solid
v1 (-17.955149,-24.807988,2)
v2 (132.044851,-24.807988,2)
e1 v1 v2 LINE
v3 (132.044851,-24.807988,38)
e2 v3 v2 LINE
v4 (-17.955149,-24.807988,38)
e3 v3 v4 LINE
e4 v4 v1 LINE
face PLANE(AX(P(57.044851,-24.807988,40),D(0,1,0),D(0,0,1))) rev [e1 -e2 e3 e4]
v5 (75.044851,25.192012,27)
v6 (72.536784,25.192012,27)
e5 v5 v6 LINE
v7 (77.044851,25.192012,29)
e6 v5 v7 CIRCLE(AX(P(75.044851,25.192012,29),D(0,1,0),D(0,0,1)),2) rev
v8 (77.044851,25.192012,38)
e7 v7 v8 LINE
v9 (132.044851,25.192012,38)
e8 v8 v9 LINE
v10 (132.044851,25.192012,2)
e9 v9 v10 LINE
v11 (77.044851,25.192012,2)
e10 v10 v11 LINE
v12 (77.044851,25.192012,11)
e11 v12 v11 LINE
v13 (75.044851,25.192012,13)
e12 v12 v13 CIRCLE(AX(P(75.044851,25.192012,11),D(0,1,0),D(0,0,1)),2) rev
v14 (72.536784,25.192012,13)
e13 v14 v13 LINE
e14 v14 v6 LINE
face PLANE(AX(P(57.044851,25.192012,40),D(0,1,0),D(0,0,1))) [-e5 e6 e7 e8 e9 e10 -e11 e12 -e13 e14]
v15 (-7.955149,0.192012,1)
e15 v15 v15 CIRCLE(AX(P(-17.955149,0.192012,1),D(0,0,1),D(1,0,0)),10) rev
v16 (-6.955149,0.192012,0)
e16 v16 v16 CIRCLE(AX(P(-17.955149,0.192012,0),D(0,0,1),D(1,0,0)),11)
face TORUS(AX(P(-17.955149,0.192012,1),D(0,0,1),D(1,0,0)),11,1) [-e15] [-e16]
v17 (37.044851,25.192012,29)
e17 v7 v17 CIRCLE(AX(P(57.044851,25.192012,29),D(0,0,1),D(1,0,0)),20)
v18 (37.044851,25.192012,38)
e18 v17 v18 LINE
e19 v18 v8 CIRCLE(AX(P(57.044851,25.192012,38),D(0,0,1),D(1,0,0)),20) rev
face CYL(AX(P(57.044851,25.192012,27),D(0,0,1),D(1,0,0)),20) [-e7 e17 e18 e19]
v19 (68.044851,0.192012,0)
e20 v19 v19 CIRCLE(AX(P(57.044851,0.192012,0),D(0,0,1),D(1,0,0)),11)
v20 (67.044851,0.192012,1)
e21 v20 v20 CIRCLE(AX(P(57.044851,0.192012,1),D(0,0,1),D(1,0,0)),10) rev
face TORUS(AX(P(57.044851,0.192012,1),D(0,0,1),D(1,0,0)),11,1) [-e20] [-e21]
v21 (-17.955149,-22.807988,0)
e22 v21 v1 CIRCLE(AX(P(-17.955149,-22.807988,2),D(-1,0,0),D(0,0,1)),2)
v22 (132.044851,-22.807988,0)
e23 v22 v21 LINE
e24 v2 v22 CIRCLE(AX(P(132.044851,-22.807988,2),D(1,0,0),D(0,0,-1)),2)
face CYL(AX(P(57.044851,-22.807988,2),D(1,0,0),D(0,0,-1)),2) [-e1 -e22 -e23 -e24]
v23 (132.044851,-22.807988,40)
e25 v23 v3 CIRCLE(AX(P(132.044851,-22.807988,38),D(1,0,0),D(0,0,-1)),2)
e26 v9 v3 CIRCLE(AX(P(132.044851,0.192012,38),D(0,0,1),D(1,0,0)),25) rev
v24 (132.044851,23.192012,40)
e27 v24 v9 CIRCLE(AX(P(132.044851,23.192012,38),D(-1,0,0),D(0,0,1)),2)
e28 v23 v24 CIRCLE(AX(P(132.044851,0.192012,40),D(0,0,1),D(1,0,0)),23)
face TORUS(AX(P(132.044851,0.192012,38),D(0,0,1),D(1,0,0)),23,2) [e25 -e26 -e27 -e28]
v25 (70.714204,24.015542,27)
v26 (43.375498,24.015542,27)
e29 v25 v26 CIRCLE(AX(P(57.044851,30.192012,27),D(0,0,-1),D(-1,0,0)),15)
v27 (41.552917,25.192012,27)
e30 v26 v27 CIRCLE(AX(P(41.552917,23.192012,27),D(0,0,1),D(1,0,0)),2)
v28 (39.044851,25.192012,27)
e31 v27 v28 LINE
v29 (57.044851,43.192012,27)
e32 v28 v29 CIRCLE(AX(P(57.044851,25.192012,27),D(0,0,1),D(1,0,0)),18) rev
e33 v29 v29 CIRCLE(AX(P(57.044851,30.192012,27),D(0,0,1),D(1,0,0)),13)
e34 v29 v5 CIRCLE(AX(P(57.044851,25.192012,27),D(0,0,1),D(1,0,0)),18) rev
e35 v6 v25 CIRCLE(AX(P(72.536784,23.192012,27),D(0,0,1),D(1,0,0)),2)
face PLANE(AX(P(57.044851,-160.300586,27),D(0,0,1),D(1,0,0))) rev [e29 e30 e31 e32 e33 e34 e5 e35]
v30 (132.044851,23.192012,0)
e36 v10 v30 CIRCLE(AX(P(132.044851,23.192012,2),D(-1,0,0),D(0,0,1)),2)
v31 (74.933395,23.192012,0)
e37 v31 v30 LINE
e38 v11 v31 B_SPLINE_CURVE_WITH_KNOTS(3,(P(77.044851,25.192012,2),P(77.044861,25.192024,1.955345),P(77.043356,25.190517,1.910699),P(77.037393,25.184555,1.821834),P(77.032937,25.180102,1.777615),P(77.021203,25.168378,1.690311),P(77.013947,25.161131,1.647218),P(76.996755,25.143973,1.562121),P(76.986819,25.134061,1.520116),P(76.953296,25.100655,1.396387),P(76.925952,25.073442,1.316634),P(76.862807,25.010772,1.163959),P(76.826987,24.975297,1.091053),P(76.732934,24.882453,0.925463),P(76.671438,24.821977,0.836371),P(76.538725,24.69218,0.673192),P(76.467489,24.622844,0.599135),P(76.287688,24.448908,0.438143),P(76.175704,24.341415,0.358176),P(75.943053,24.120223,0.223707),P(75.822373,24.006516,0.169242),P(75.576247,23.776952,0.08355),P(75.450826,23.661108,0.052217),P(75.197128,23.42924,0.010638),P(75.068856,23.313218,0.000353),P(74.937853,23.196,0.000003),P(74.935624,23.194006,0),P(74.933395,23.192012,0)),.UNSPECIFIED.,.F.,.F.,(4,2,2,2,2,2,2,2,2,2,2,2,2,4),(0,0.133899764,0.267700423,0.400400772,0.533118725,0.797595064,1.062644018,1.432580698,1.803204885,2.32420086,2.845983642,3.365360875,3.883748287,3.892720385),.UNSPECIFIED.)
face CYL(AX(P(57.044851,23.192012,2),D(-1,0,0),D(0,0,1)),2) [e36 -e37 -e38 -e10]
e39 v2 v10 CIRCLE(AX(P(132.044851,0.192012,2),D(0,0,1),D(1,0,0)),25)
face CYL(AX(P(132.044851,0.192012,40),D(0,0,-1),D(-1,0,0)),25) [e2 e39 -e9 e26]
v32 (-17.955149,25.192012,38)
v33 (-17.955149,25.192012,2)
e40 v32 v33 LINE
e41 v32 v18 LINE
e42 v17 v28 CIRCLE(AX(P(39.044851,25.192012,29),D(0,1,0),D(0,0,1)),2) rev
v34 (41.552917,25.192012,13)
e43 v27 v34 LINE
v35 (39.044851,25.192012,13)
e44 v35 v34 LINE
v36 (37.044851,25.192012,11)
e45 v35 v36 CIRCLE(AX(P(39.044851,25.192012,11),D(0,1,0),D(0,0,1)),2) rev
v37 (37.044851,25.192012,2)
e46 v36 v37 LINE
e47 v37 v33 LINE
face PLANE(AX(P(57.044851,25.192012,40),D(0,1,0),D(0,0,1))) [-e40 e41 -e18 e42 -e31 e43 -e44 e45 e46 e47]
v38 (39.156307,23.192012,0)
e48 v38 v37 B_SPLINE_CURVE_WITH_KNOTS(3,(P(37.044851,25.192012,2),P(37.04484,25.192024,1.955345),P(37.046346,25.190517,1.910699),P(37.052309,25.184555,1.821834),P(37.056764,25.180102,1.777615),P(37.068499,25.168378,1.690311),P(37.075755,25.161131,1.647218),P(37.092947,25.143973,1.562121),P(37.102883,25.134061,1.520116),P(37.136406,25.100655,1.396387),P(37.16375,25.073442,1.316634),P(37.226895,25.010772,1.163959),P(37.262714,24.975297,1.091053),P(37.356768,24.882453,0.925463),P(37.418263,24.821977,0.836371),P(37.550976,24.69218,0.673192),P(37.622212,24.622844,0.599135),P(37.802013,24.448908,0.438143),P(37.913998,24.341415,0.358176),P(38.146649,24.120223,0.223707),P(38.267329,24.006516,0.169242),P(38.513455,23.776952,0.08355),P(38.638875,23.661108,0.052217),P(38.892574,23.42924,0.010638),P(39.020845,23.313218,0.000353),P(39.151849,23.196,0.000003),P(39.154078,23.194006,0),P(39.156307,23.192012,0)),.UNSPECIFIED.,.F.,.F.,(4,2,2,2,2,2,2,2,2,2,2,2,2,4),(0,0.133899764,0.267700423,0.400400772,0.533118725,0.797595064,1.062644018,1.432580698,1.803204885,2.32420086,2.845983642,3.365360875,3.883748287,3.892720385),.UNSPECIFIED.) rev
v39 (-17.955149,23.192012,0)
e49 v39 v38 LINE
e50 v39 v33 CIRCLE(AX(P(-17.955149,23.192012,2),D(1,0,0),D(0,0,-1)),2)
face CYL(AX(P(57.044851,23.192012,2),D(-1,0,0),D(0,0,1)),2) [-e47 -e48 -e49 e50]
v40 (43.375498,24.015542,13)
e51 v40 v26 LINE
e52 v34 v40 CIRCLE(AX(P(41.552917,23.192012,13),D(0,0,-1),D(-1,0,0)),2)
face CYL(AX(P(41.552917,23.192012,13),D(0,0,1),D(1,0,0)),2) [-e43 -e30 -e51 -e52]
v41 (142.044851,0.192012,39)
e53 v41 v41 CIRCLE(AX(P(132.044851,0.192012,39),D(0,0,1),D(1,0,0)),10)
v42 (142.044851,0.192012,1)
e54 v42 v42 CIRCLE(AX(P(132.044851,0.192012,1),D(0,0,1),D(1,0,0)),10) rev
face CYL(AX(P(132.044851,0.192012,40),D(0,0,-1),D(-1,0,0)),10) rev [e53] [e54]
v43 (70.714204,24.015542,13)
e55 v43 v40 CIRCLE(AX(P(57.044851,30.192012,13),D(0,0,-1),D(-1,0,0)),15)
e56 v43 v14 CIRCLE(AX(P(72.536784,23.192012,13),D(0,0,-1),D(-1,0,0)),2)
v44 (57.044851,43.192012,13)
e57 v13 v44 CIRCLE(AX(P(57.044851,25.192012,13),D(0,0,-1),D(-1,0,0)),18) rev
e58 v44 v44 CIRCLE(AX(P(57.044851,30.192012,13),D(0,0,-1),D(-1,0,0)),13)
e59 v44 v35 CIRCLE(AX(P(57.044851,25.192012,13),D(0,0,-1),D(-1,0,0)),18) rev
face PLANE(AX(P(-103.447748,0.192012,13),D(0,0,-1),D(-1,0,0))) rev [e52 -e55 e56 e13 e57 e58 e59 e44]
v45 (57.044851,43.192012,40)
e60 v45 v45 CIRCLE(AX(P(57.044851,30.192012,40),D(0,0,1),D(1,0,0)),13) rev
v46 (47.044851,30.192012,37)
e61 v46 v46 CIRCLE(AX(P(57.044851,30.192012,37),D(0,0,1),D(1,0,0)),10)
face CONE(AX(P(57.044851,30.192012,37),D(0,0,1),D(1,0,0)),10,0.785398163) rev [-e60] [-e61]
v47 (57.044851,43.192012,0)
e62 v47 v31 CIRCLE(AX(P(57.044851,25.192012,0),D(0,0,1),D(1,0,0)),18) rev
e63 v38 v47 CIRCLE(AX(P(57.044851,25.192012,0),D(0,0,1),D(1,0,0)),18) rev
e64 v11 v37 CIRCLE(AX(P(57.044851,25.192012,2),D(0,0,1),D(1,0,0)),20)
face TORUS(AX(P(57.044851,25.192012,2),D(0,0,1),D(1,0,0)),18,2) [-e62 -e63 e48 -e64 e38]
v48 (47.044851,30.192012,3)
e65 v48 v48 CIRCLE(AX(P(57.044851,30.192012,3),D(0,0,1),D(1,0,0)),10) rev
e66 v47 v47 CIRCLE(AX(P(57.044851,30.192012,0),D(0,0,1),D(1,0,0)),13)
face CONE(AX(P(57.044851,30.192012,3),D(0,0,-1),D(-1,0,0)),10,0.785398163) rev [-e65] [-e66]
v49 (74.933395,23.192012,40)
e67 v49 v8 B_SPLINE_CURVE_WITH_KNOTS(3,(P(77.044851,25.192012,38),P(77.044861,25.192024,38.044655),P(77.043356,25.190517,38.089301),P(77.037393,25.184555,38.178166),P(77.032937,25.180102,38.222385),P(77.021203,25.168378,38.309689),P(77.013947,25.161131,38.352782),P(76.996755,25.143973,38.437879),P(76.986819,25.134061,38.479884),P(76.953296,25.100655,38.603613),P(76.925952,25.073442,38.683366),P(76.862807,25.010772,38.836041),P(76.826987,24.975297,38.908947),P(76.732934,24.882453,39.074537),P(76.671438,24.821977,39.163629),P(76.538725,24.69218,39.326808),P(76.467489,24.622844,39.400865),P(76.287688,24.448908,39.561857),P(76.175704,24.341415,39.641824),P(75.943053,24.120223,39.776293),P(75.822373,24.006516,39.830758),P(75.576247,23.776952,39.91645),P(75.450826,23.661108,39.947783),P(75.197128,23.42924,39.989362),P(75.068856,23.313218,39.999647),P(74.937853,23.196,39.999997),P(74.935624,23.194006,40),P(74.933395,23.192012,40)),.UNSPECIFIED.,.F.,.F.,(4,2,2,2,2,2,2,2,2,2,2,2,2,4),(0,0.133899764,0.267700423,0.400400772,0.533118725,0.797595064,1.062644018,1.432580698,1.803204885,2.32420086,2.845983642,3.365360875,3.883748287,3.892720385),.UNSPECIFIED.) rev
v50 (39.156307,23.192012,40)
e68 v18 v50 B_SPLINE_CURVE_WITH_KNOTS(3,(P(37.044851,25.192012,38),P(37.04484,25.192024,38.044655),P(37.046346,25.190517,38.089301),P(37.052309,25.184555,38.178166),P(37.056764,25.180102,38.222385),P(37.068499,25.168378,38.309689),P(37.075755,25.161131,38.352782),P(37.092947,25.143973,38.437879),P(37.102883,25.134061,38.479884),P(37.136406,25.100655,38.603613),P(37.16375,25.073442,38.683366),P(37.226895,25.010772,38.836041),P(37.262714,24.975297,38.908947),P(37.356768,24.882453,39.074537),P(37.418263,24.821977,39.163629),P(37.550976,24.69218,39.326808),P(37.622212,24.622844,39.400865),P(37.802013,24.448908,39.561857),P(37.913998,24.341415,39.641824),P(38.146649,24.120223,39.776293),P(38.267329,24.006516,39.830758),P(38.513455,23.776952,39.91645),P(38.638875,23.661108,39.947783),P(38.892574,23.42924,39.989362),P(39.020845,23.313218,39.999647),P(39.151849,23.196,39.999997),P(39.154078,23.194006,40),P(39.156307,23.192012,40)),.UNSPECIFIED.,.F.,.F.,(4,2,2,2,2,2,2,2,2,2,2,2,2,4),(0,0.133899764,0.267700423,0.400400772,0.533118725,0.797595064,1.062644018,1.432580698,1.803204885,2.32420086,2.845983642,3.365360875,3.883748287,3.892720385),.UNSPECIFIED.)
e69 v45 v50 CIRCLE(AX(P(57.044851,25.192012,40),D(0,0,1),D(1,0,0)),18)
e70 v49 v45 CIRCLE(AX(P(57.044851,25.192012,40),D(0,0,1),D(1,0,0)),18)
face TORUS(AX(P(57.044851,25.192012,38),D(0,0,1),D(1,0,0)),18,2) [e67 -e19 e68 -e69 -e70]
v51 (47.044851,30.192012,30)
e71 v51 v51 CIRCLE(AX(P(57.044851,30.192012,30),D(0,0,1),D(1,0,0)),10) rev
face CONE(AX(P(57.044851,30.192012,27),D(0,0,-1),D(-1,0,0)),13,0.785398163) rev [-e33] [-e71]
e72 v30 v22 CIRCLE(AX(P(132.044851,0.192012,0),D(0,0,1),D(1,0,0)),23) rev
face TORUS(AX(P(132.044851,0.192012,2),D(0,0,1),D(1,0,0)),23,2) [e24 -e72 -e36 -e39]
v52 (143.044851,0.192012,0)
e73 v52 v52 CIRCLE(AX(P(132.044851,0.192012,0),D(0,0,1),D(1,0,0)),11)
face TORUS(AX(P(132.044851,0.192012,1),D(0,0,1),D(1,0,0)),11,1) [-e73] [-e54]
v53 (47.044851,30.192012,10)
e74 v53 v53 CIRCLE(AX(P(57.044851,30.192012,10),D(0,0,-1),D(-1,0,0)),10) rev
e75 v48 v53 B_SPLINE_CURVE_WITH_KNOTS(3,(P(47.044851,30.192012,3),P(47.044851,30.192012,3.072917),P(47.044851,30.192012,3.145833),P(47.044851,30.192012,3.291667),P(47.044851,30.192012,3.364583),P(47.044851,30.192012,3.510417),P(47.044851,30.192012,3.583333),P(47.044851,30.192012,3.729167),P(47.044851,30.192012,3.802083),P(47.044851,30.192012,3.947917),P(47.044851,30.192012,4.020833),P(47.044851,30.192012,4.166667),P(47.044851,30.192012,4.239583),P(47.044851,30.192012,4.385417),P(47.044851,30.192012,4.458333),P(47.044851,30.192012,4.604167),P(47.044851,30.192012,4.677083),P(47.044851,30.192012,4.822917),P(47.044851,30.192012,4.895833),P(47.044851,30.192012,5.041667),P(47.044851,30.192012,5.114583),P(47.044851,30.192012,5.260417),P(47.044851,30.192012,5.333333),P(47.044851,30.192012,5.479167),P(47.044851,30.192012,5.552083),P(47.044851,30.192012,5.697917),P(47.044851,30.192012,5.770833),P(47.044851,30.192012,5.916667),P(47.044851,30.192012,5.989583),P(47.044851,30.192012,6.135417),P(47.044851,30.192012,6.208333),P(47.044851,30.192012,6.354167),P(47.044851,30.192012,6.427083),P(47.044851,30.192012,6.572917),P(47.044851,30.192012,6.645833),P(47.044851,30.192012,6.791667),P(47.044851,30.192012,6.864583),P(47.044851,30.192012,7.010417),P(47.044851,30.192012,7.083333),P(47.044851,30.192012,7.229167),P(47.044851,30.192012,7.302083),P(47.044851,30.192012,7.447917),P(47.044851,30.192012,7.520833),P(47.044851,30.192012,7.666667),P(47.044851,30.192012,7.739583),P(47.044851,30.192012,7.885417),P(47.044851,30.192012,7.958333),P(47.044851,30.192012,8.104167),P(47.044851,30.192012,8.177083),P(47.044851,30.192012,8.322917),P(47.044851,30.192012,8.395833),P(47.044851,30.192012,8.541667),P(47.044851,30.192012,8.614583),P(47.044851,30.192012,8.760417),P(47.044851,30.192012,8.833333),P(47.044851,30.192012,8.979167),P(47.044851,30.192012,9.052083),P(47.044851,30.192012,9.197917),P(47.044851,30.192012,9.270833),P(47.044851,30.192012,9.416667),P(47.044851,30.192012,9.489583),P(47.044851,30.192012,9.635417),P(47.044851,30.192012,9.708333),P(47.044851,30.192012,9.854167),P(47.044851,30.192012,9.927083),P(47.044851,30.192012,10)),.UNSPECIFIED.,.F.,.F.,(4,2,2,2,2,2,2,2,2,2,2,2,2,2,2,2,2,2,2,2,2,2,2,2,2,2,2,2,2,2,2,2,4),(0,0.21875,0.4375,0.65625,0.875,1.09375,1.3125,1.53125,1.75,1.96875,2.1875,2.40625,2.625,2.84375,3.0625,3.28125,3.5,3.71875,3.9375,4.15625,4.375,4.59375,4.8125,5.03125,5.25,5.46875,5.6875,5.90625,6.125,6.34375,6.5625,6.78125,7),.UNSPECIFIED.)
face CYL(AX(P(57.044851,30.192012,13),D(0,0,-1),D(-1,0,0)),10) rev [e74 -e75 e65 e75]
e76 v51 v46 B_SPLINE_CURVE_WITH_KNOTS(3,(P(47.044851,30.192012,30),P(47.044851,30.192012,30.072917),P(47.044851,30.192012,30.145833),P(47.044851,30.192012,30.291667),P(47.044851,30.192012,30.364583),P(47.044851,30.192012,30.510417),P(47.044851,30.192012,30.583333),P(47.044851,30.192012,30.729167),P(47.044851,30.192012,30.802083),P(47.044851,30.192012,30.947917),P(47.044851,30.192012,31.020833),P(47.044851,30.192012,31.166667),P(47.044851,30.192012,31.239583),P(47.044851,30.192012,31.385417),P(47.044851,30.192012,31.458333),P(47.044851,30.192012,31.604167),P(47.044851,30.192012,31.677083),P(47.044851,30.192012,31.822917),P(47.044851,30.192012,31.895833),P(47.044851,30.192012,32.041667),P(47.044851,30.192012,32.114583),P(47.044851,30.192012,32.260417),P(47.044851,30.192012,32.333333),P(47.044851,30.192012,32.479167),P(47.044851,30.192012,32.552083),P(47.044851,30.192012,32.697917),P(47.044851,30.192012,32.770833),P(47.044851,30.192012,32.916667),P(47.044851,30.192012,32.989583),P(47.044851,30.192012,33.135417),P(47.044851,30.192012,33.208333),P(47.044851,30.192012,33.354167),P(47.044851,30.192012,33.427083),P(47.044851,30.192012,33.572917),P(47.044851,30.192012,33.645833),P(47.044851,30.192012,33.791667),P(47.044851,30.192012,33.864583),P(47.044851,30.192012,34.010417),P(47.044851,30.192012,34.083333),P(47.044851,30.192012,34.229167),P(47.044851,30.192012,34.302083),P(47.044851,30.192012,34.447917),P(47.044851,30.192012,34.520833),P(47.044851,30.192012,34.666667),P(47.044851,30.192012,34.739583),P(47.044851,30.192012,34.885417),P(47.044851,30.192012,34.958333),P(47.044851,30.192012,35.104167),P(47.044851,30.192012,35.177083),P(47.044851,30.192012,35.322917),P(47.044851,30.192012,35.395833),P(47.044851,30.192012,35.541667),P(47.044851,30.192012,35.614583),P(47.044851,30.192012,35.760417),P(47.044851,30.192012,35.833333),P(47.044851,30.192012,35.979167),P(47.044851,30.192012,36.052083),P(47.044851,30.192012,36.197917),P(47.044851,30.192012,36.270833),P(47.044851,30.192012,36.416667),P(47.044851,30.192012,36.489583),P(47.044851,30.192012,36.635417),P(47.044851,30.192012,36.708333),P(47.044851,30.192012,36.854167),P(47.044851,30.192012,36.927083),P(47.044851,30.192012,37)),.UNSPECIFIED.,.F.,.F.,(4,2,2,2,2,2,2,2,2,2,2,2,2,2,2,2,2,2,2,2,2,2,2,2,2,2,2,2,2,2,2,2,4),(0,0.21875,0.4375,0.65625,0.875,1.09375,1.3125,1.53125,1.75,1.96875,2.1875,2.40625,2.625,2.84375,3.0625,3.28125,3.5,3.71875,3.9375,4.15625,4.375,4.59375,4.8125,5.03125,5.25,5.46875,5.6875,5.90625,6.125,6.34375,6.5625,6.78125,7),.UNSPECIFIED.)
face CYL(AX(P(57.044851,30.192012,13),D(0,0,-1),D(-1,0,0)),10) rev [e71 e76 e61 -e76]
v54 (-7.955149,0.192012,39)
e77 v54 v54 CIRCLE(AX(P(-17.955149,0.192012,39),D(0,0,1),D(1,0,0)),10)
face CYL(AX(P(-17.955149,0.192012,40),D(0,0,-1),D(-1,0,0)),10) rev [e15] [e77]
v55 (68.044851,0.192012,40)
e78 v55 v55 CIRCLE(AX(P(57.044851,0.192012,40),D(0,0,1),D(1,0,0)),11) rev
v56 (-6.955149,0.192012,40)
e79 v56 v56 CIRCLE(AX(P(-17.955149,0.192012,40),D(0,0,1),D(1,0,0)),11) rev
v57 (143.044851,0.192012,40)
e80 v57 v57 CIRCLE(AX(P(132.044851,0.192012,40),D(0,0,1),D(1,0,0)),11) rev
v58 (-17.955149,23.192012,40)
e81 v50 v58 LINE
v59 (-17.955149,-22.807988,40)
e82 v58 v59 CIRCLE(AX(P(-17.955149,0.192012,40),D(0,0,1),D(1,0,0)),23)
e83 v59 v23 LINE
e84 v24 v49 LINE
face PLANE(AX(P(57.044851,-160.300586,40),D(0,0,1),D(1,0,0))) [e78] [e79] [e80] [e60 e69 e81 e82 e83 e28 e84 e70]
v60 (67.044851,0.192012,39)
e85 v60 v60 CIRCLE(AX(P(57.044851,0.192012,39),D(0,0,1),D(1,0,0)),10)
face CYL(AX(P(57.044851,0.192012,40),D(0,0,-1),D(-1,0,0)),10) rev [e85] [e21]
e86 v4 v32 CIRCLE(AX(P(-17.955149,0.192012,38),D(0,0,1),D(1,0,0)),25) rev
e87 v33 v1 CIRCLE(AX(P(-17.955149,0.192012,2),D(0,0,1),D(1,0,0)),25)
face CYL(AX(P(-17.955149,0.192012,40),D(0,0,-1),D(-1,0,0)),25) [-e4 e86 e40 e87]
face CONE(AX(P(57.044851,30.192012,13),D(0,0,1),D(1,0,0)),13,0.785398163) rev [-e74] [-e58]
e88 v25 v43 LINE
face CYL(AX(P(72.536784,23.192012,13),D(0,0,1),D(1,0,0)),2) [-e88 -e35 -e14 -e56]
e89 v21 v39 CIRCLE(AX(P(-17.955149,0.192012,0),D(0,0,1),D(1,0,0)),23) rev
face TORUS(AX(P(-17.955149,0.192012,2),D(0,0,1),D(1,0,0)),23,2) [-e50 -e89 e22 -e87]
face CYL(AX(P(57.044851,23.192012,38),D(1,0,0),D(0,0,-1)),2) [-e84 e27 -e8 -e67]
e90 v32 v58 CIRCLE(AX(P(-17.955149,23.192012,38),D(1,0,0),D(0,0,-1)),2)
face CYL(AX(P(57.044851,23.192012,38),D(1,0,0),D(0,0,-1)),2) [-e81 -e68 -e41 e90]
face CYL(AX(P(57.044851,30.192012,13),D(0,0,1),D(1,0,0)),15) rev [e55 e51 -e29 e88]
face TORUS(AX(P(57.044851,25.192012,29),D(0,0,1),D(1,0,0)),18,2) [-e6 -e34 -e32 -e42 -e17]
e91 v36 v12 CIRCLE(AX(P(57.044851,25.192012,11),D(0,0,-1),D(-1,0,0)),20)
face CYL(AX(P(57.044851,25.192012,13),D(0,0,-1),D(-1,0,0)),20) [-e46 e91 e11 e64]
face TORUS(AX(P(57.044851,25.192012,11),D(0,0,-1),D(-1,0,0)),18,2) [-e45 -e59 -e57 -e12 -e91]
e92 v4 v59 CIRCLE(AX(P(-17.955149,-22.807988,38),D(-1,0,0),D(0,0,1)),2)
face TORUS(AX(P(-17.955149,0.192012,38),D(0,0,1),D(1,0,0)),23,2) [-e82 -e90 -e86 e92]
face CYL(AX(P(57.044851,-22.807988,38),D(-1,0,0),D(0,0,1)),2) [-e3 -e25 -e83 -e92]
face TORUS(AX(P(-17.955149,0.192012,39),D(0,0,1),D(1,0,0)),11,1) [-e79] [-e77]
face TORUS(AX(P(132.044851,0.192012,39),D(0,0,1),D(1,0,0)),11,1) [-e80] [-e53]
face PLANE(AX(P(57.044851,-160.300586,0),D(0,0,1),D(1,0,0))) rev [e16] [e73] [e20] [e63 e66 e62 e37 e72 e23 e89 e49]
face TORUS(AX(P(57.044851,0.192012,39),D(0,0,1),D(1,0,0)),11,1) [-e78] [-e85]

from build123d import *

# Parameters (mm, degrees)
ESQUISSE1_R             = 25
ESQUISSE1_R_2           = 10
ESQUISSE1_R_3           = 25.000000000000004
ESQUISSE1_R_4           = 10.000000000000009
BOSS_EXTRU_1_DEPTH      = 40
BOSS_EXTRU_6_DEPTH      = 13
BOSS_EXTRU_7_START      = -13
BOSS_EXTRU_7_DEPTH      = 13
ENL_V_START             = -40
ENL_V_MAT_EXTRU_3_DEPTH = 40
ESQUISSE16_R            = 14.999999999999998
ENL_V_MAT_EXTRU_8_DEPTH = 14
CONG_4_R                = 2
CONG_7_R                = 1
CHANFREIN2_SIZE         = 3


with BuildPart() as part:
    # Esquisse1 → Boss.-Extru.1 (new body)
    # profile 1 of 4: a face of its own
    with BuildSketch(Plane.XY):
        with Locations((-17.955149191533145, 0.1920124875943955)):
            Circle(ESQUISSE1_R)
        with Locations((-17.955149191533145, 0.1920124875943955)):
            Circle(ESQUISSE1_R_2, mode=Mode.SUBTRACT)
    # profile 2 of 4: a face of its own
    with BuildSketch(Plane.XY):
        with BuildLine():
            Line((57.044850808466855, 10.192012487594386), (57.044850808466855, 25.192012487594397))
            Line((57.044850808466855, 25.192012487594397), (-17.95514919153466, 25.192012487594397))
            ThreePointArc((-17.95514919153466, 25.192012487594397), (-0.27747966186999307, 17.86968201725862), (7.044850808466855, 0.1920124875943955))
            ThreePointArc((7.044850808466855, 0.19201248759438935), (-0.27747966186997886, -17.485657042069814), (-17.955149191534638, -24.807987512405603))
            Line((-17.955149191534638, -24.807987512405607), (57.044850808466855, -24.807987512405607))
            Line((57.044850808466855, -24.807987512405603), (57.044850808466855, -9.807987512405603))
            ThreePointArc((57.0448508084668, -9.8079875124056), (47.04485080846686, 0.192012487594395), (57.044850808466805, 10.192012487594386))
        make_face()
    # profile 3 of 4: a face of its own
    with BuildSketch(Plane.XY):
        with BuildLine():
            Line((132.04485080846524, 25.192012487594397), (57.044850808466855, 25.192012487594397))
            Line((57.044850808466855, 25.192012487594397), (57.044850808466855, 10.192012487594386))
            ThreePointArc((57.044850808466805, 10.192012487594386), (64.11591862033231, 7.263080299459882), (67.04485080846685, 0.19201248759439377))
            ThreePointArc((67.04485080846685, 0.19201248759439132), (64.11591862033231, -6.879055324271097), (57.0448508084668, -9.8079875124056))
            Line((57.044850808466855, -9.807987512405603), (57.044850808466855, -24.807987512405603))
            Line((57.044850808466855, -24.807987512405607), (132.04485080846544, -24.807987512405607))
            ThreePointArc((132.04485080846544, -24.807987512405607), (107.04485080846686, 0.19201248759430972), (132.04485080846524, 25.1920124875944))
        make_face()
    # profile 4 of 4: a face of its own
    with BuildSketch(Plane.XY):
        with Locations((132.04485080846686, 0.1920124875943955)):
            Circle(ESQUISSE1_R_3)
        with Locations((132.04485080846686, 0.1920124875943955)):
            Circle(ESQUISSE1_R_4, mode=Mode.SUBTRACT)
    extrude(amount=BOSS_EXTRU_1_DEPTH)

    # Esquisse2 → Boss.-Extru.6 (add)
    with BuildSketch(Plane(origin=(0, 0, 0), x_dir=(-1, 0, 0), z_dir=(0, 0, -1))):
        with BuildLine():
            Line((-77.04485080846686, 25.192012487594397), (-65.7051048463114, 25.192012487594397))
            ThreePointArc((-65.70510484631134, 25.192012487594546), (-59.63304125949198, 39.8512707504851), (-47.04485080846686, 30.192012487594393))
            ThreePointArc((-47.04485080846686, 30.19201248759439), (-47.38559254557614, 27.603822036569323), (-48.38459677062232, 25.19201248759465))
            Line((-48.38459677062223, 25.192012487594397), (-37.04485080846687, 25.192012487594397))
            ThreePointArc((-37.04485080846687, 25.192012487594397), (-57.04485080846686, 45.19201248759439), (-77.04485080846686, 25.1920124875944))
        make_face()
    extrude(amount=-BOSS_EXTRU_6_DEPTH)

    # Esquisse12 → Boss.-Extru.7 (add)
    with BuildSketch(Plane.XY.offset(40).offset(BOSS_EXTRU_7_START)):
        with BuildLine():
            ThreePointArc((48.384596770622466, 25.192012487594397), (48.38459677062255, 35.192012487594525), (57.04485080846716, 40.1920124875944))
            Line((57.04485080846686, 40.1920124875944), (57.04485080846686, 45.19201248759438))
            ThreePointArc((57.04485080846686, 45.19201248759439), (42.90271518473592, 39.33414811132534), (37.04485080846687, 25.1920124875944))
            Line((37.04485080846687, 25.192012487594397), (48.38459677062247, 25.192012487594397))
        make_face()
        with BuildLine():
            Line((57.04485080846686, 45.19201248759438), (57.04485080846686, 40.1920124875944))
            ThreePointArc((57.04485080846716, 40.1920124875944), (64.11591862033245, 37.263080299459766), (67.04485080846686, 30.192012487594393))
            ThreePointArc((67.04485080846686, 30.19201248759439), (66.70410907135755, 27.603822036569184), (65.70510484631126, 25.192012487594397))
            Line((65.70510484631126, 25.192012487594397), (77.04485080846686, 25.192012487594397))
            ThreePointArc((77.04485080846686, 25.192012487594397), (71.18698643219781, 39.33414811132534), (57.04485080846686, 45.19201248759439))
        make_face()
    extrude(amount=BOSS_EXTRU_7_DEPTH)

    # Esquisse14 → Enlèv. mat.-Extru.3 (cut)
    with BuildSketch(Plane.XY.offset(40).offset(ENL_V_START)):
        with BuildLine():
            Line((65.70510484631126, 25.192012487594397), (57.04485080846686, 25.192012487594397))
            Line((57.04485080846686, 25.192012487594397), (48.38459677062247, 25.192012487594397))
            ThreePointArc((48.38459677062246, 25.192012487594386), (57.04485080846686, 20.192012487594354), (65.70510484631127, 25.19201248759439))
        make_face()
    extrude(amount=ENL_V_MAT_EXTRU_3_DEPTH, mode=Mode.SUBTRACT)

    # Esquisse16 → Enlèv. mat.-Extru.8 (cut)
    with BuildSketch(Plane(origin=(0, 0, 27.000000000000004), x_dir=(-1, 0, 0), z_dir=(0, 0, -1))):
        with Locations((-57.04485080846686, 30.192012487594393)):
            Circle(ESQUISSE16_R)
    extrude(amount=ENL_V_MAT_EXTRU_8_DEPTH, mode=Mode.SUBTRACT)

    # Congé4
    cong_4_edges = [part.edges().sort_by_distance(p)[0] for p in [
        (-42.955149191533145, 0.19201248759437634, 0),
        (9.544850808466101, 25.192012487594397, 0),
        (157.04485080846686, 0.19201248759449943, 0),
        (57.0448508084654, -24.807987512405603, 0),
        (157.04485080846686, 0.1920124875944905, 40),
        (9.544850808466109, 25.192012487594397, 40),
        (-42.955149191533145, 0.19201248759437634, 40),
        (104.54485080846605, 25.192012487594397, 0),
        (57.04485080846686, 45.19201248759438, 13),
        (57.04485080846686, 45.19201248759438, 0),
        (104.54485080846605, 25.192012487594397, 40),
        (57.04485080846686, 45.1920124875944, 27),
        (57.04485080846686, 45.19201248759439, 40),
        (57.0448508084654, -24.807987512405603, 40),
        (42.90271518473591, 25.192012487594397, 20),
        (71.18698643219781, 25.192012487594397, 20),
    ]]
    fillet(cong_4_edges, radius=CONG_4_R)

    # Congé7
    cong_7_edges = [part.edges().sort_by_distance(p)[0] for p in [
        (-27.955149191533145, 0.1920124875943967, 0),
        (57.0448508084669, 10.192012487594384, 0),
        (57.04485080846691, 10.192012487594384, 40),
        (-27.955149191533145, 0.1920124875943967, 40),
        (122.04485080846685, 0.1920124875943967, 40),
        (122.04485080846685, 0.1920124875943967, 0),
    ]]
    fillet(cong_7_edges, radius=CONG_7_R)

    # Chanfrein2
    chanfrein2_edges = [part.edges().sort_by_distance(p)[0] for p in [
        (67.04485080846675, 30.192012487594347, 0),
        (67.04485080846675, 30.192012487594347, 13),
        (65.70510484631126, 35.19201248759437, 40),
        (65.70510484631127, 35.19201248759438, 27),
    ]]
    chamfer(chanfrein2_edges, length=CHANFREIN2_SIZE - 0.0001)  # a hair under: the kernel refuses the full size


solid = part.part
